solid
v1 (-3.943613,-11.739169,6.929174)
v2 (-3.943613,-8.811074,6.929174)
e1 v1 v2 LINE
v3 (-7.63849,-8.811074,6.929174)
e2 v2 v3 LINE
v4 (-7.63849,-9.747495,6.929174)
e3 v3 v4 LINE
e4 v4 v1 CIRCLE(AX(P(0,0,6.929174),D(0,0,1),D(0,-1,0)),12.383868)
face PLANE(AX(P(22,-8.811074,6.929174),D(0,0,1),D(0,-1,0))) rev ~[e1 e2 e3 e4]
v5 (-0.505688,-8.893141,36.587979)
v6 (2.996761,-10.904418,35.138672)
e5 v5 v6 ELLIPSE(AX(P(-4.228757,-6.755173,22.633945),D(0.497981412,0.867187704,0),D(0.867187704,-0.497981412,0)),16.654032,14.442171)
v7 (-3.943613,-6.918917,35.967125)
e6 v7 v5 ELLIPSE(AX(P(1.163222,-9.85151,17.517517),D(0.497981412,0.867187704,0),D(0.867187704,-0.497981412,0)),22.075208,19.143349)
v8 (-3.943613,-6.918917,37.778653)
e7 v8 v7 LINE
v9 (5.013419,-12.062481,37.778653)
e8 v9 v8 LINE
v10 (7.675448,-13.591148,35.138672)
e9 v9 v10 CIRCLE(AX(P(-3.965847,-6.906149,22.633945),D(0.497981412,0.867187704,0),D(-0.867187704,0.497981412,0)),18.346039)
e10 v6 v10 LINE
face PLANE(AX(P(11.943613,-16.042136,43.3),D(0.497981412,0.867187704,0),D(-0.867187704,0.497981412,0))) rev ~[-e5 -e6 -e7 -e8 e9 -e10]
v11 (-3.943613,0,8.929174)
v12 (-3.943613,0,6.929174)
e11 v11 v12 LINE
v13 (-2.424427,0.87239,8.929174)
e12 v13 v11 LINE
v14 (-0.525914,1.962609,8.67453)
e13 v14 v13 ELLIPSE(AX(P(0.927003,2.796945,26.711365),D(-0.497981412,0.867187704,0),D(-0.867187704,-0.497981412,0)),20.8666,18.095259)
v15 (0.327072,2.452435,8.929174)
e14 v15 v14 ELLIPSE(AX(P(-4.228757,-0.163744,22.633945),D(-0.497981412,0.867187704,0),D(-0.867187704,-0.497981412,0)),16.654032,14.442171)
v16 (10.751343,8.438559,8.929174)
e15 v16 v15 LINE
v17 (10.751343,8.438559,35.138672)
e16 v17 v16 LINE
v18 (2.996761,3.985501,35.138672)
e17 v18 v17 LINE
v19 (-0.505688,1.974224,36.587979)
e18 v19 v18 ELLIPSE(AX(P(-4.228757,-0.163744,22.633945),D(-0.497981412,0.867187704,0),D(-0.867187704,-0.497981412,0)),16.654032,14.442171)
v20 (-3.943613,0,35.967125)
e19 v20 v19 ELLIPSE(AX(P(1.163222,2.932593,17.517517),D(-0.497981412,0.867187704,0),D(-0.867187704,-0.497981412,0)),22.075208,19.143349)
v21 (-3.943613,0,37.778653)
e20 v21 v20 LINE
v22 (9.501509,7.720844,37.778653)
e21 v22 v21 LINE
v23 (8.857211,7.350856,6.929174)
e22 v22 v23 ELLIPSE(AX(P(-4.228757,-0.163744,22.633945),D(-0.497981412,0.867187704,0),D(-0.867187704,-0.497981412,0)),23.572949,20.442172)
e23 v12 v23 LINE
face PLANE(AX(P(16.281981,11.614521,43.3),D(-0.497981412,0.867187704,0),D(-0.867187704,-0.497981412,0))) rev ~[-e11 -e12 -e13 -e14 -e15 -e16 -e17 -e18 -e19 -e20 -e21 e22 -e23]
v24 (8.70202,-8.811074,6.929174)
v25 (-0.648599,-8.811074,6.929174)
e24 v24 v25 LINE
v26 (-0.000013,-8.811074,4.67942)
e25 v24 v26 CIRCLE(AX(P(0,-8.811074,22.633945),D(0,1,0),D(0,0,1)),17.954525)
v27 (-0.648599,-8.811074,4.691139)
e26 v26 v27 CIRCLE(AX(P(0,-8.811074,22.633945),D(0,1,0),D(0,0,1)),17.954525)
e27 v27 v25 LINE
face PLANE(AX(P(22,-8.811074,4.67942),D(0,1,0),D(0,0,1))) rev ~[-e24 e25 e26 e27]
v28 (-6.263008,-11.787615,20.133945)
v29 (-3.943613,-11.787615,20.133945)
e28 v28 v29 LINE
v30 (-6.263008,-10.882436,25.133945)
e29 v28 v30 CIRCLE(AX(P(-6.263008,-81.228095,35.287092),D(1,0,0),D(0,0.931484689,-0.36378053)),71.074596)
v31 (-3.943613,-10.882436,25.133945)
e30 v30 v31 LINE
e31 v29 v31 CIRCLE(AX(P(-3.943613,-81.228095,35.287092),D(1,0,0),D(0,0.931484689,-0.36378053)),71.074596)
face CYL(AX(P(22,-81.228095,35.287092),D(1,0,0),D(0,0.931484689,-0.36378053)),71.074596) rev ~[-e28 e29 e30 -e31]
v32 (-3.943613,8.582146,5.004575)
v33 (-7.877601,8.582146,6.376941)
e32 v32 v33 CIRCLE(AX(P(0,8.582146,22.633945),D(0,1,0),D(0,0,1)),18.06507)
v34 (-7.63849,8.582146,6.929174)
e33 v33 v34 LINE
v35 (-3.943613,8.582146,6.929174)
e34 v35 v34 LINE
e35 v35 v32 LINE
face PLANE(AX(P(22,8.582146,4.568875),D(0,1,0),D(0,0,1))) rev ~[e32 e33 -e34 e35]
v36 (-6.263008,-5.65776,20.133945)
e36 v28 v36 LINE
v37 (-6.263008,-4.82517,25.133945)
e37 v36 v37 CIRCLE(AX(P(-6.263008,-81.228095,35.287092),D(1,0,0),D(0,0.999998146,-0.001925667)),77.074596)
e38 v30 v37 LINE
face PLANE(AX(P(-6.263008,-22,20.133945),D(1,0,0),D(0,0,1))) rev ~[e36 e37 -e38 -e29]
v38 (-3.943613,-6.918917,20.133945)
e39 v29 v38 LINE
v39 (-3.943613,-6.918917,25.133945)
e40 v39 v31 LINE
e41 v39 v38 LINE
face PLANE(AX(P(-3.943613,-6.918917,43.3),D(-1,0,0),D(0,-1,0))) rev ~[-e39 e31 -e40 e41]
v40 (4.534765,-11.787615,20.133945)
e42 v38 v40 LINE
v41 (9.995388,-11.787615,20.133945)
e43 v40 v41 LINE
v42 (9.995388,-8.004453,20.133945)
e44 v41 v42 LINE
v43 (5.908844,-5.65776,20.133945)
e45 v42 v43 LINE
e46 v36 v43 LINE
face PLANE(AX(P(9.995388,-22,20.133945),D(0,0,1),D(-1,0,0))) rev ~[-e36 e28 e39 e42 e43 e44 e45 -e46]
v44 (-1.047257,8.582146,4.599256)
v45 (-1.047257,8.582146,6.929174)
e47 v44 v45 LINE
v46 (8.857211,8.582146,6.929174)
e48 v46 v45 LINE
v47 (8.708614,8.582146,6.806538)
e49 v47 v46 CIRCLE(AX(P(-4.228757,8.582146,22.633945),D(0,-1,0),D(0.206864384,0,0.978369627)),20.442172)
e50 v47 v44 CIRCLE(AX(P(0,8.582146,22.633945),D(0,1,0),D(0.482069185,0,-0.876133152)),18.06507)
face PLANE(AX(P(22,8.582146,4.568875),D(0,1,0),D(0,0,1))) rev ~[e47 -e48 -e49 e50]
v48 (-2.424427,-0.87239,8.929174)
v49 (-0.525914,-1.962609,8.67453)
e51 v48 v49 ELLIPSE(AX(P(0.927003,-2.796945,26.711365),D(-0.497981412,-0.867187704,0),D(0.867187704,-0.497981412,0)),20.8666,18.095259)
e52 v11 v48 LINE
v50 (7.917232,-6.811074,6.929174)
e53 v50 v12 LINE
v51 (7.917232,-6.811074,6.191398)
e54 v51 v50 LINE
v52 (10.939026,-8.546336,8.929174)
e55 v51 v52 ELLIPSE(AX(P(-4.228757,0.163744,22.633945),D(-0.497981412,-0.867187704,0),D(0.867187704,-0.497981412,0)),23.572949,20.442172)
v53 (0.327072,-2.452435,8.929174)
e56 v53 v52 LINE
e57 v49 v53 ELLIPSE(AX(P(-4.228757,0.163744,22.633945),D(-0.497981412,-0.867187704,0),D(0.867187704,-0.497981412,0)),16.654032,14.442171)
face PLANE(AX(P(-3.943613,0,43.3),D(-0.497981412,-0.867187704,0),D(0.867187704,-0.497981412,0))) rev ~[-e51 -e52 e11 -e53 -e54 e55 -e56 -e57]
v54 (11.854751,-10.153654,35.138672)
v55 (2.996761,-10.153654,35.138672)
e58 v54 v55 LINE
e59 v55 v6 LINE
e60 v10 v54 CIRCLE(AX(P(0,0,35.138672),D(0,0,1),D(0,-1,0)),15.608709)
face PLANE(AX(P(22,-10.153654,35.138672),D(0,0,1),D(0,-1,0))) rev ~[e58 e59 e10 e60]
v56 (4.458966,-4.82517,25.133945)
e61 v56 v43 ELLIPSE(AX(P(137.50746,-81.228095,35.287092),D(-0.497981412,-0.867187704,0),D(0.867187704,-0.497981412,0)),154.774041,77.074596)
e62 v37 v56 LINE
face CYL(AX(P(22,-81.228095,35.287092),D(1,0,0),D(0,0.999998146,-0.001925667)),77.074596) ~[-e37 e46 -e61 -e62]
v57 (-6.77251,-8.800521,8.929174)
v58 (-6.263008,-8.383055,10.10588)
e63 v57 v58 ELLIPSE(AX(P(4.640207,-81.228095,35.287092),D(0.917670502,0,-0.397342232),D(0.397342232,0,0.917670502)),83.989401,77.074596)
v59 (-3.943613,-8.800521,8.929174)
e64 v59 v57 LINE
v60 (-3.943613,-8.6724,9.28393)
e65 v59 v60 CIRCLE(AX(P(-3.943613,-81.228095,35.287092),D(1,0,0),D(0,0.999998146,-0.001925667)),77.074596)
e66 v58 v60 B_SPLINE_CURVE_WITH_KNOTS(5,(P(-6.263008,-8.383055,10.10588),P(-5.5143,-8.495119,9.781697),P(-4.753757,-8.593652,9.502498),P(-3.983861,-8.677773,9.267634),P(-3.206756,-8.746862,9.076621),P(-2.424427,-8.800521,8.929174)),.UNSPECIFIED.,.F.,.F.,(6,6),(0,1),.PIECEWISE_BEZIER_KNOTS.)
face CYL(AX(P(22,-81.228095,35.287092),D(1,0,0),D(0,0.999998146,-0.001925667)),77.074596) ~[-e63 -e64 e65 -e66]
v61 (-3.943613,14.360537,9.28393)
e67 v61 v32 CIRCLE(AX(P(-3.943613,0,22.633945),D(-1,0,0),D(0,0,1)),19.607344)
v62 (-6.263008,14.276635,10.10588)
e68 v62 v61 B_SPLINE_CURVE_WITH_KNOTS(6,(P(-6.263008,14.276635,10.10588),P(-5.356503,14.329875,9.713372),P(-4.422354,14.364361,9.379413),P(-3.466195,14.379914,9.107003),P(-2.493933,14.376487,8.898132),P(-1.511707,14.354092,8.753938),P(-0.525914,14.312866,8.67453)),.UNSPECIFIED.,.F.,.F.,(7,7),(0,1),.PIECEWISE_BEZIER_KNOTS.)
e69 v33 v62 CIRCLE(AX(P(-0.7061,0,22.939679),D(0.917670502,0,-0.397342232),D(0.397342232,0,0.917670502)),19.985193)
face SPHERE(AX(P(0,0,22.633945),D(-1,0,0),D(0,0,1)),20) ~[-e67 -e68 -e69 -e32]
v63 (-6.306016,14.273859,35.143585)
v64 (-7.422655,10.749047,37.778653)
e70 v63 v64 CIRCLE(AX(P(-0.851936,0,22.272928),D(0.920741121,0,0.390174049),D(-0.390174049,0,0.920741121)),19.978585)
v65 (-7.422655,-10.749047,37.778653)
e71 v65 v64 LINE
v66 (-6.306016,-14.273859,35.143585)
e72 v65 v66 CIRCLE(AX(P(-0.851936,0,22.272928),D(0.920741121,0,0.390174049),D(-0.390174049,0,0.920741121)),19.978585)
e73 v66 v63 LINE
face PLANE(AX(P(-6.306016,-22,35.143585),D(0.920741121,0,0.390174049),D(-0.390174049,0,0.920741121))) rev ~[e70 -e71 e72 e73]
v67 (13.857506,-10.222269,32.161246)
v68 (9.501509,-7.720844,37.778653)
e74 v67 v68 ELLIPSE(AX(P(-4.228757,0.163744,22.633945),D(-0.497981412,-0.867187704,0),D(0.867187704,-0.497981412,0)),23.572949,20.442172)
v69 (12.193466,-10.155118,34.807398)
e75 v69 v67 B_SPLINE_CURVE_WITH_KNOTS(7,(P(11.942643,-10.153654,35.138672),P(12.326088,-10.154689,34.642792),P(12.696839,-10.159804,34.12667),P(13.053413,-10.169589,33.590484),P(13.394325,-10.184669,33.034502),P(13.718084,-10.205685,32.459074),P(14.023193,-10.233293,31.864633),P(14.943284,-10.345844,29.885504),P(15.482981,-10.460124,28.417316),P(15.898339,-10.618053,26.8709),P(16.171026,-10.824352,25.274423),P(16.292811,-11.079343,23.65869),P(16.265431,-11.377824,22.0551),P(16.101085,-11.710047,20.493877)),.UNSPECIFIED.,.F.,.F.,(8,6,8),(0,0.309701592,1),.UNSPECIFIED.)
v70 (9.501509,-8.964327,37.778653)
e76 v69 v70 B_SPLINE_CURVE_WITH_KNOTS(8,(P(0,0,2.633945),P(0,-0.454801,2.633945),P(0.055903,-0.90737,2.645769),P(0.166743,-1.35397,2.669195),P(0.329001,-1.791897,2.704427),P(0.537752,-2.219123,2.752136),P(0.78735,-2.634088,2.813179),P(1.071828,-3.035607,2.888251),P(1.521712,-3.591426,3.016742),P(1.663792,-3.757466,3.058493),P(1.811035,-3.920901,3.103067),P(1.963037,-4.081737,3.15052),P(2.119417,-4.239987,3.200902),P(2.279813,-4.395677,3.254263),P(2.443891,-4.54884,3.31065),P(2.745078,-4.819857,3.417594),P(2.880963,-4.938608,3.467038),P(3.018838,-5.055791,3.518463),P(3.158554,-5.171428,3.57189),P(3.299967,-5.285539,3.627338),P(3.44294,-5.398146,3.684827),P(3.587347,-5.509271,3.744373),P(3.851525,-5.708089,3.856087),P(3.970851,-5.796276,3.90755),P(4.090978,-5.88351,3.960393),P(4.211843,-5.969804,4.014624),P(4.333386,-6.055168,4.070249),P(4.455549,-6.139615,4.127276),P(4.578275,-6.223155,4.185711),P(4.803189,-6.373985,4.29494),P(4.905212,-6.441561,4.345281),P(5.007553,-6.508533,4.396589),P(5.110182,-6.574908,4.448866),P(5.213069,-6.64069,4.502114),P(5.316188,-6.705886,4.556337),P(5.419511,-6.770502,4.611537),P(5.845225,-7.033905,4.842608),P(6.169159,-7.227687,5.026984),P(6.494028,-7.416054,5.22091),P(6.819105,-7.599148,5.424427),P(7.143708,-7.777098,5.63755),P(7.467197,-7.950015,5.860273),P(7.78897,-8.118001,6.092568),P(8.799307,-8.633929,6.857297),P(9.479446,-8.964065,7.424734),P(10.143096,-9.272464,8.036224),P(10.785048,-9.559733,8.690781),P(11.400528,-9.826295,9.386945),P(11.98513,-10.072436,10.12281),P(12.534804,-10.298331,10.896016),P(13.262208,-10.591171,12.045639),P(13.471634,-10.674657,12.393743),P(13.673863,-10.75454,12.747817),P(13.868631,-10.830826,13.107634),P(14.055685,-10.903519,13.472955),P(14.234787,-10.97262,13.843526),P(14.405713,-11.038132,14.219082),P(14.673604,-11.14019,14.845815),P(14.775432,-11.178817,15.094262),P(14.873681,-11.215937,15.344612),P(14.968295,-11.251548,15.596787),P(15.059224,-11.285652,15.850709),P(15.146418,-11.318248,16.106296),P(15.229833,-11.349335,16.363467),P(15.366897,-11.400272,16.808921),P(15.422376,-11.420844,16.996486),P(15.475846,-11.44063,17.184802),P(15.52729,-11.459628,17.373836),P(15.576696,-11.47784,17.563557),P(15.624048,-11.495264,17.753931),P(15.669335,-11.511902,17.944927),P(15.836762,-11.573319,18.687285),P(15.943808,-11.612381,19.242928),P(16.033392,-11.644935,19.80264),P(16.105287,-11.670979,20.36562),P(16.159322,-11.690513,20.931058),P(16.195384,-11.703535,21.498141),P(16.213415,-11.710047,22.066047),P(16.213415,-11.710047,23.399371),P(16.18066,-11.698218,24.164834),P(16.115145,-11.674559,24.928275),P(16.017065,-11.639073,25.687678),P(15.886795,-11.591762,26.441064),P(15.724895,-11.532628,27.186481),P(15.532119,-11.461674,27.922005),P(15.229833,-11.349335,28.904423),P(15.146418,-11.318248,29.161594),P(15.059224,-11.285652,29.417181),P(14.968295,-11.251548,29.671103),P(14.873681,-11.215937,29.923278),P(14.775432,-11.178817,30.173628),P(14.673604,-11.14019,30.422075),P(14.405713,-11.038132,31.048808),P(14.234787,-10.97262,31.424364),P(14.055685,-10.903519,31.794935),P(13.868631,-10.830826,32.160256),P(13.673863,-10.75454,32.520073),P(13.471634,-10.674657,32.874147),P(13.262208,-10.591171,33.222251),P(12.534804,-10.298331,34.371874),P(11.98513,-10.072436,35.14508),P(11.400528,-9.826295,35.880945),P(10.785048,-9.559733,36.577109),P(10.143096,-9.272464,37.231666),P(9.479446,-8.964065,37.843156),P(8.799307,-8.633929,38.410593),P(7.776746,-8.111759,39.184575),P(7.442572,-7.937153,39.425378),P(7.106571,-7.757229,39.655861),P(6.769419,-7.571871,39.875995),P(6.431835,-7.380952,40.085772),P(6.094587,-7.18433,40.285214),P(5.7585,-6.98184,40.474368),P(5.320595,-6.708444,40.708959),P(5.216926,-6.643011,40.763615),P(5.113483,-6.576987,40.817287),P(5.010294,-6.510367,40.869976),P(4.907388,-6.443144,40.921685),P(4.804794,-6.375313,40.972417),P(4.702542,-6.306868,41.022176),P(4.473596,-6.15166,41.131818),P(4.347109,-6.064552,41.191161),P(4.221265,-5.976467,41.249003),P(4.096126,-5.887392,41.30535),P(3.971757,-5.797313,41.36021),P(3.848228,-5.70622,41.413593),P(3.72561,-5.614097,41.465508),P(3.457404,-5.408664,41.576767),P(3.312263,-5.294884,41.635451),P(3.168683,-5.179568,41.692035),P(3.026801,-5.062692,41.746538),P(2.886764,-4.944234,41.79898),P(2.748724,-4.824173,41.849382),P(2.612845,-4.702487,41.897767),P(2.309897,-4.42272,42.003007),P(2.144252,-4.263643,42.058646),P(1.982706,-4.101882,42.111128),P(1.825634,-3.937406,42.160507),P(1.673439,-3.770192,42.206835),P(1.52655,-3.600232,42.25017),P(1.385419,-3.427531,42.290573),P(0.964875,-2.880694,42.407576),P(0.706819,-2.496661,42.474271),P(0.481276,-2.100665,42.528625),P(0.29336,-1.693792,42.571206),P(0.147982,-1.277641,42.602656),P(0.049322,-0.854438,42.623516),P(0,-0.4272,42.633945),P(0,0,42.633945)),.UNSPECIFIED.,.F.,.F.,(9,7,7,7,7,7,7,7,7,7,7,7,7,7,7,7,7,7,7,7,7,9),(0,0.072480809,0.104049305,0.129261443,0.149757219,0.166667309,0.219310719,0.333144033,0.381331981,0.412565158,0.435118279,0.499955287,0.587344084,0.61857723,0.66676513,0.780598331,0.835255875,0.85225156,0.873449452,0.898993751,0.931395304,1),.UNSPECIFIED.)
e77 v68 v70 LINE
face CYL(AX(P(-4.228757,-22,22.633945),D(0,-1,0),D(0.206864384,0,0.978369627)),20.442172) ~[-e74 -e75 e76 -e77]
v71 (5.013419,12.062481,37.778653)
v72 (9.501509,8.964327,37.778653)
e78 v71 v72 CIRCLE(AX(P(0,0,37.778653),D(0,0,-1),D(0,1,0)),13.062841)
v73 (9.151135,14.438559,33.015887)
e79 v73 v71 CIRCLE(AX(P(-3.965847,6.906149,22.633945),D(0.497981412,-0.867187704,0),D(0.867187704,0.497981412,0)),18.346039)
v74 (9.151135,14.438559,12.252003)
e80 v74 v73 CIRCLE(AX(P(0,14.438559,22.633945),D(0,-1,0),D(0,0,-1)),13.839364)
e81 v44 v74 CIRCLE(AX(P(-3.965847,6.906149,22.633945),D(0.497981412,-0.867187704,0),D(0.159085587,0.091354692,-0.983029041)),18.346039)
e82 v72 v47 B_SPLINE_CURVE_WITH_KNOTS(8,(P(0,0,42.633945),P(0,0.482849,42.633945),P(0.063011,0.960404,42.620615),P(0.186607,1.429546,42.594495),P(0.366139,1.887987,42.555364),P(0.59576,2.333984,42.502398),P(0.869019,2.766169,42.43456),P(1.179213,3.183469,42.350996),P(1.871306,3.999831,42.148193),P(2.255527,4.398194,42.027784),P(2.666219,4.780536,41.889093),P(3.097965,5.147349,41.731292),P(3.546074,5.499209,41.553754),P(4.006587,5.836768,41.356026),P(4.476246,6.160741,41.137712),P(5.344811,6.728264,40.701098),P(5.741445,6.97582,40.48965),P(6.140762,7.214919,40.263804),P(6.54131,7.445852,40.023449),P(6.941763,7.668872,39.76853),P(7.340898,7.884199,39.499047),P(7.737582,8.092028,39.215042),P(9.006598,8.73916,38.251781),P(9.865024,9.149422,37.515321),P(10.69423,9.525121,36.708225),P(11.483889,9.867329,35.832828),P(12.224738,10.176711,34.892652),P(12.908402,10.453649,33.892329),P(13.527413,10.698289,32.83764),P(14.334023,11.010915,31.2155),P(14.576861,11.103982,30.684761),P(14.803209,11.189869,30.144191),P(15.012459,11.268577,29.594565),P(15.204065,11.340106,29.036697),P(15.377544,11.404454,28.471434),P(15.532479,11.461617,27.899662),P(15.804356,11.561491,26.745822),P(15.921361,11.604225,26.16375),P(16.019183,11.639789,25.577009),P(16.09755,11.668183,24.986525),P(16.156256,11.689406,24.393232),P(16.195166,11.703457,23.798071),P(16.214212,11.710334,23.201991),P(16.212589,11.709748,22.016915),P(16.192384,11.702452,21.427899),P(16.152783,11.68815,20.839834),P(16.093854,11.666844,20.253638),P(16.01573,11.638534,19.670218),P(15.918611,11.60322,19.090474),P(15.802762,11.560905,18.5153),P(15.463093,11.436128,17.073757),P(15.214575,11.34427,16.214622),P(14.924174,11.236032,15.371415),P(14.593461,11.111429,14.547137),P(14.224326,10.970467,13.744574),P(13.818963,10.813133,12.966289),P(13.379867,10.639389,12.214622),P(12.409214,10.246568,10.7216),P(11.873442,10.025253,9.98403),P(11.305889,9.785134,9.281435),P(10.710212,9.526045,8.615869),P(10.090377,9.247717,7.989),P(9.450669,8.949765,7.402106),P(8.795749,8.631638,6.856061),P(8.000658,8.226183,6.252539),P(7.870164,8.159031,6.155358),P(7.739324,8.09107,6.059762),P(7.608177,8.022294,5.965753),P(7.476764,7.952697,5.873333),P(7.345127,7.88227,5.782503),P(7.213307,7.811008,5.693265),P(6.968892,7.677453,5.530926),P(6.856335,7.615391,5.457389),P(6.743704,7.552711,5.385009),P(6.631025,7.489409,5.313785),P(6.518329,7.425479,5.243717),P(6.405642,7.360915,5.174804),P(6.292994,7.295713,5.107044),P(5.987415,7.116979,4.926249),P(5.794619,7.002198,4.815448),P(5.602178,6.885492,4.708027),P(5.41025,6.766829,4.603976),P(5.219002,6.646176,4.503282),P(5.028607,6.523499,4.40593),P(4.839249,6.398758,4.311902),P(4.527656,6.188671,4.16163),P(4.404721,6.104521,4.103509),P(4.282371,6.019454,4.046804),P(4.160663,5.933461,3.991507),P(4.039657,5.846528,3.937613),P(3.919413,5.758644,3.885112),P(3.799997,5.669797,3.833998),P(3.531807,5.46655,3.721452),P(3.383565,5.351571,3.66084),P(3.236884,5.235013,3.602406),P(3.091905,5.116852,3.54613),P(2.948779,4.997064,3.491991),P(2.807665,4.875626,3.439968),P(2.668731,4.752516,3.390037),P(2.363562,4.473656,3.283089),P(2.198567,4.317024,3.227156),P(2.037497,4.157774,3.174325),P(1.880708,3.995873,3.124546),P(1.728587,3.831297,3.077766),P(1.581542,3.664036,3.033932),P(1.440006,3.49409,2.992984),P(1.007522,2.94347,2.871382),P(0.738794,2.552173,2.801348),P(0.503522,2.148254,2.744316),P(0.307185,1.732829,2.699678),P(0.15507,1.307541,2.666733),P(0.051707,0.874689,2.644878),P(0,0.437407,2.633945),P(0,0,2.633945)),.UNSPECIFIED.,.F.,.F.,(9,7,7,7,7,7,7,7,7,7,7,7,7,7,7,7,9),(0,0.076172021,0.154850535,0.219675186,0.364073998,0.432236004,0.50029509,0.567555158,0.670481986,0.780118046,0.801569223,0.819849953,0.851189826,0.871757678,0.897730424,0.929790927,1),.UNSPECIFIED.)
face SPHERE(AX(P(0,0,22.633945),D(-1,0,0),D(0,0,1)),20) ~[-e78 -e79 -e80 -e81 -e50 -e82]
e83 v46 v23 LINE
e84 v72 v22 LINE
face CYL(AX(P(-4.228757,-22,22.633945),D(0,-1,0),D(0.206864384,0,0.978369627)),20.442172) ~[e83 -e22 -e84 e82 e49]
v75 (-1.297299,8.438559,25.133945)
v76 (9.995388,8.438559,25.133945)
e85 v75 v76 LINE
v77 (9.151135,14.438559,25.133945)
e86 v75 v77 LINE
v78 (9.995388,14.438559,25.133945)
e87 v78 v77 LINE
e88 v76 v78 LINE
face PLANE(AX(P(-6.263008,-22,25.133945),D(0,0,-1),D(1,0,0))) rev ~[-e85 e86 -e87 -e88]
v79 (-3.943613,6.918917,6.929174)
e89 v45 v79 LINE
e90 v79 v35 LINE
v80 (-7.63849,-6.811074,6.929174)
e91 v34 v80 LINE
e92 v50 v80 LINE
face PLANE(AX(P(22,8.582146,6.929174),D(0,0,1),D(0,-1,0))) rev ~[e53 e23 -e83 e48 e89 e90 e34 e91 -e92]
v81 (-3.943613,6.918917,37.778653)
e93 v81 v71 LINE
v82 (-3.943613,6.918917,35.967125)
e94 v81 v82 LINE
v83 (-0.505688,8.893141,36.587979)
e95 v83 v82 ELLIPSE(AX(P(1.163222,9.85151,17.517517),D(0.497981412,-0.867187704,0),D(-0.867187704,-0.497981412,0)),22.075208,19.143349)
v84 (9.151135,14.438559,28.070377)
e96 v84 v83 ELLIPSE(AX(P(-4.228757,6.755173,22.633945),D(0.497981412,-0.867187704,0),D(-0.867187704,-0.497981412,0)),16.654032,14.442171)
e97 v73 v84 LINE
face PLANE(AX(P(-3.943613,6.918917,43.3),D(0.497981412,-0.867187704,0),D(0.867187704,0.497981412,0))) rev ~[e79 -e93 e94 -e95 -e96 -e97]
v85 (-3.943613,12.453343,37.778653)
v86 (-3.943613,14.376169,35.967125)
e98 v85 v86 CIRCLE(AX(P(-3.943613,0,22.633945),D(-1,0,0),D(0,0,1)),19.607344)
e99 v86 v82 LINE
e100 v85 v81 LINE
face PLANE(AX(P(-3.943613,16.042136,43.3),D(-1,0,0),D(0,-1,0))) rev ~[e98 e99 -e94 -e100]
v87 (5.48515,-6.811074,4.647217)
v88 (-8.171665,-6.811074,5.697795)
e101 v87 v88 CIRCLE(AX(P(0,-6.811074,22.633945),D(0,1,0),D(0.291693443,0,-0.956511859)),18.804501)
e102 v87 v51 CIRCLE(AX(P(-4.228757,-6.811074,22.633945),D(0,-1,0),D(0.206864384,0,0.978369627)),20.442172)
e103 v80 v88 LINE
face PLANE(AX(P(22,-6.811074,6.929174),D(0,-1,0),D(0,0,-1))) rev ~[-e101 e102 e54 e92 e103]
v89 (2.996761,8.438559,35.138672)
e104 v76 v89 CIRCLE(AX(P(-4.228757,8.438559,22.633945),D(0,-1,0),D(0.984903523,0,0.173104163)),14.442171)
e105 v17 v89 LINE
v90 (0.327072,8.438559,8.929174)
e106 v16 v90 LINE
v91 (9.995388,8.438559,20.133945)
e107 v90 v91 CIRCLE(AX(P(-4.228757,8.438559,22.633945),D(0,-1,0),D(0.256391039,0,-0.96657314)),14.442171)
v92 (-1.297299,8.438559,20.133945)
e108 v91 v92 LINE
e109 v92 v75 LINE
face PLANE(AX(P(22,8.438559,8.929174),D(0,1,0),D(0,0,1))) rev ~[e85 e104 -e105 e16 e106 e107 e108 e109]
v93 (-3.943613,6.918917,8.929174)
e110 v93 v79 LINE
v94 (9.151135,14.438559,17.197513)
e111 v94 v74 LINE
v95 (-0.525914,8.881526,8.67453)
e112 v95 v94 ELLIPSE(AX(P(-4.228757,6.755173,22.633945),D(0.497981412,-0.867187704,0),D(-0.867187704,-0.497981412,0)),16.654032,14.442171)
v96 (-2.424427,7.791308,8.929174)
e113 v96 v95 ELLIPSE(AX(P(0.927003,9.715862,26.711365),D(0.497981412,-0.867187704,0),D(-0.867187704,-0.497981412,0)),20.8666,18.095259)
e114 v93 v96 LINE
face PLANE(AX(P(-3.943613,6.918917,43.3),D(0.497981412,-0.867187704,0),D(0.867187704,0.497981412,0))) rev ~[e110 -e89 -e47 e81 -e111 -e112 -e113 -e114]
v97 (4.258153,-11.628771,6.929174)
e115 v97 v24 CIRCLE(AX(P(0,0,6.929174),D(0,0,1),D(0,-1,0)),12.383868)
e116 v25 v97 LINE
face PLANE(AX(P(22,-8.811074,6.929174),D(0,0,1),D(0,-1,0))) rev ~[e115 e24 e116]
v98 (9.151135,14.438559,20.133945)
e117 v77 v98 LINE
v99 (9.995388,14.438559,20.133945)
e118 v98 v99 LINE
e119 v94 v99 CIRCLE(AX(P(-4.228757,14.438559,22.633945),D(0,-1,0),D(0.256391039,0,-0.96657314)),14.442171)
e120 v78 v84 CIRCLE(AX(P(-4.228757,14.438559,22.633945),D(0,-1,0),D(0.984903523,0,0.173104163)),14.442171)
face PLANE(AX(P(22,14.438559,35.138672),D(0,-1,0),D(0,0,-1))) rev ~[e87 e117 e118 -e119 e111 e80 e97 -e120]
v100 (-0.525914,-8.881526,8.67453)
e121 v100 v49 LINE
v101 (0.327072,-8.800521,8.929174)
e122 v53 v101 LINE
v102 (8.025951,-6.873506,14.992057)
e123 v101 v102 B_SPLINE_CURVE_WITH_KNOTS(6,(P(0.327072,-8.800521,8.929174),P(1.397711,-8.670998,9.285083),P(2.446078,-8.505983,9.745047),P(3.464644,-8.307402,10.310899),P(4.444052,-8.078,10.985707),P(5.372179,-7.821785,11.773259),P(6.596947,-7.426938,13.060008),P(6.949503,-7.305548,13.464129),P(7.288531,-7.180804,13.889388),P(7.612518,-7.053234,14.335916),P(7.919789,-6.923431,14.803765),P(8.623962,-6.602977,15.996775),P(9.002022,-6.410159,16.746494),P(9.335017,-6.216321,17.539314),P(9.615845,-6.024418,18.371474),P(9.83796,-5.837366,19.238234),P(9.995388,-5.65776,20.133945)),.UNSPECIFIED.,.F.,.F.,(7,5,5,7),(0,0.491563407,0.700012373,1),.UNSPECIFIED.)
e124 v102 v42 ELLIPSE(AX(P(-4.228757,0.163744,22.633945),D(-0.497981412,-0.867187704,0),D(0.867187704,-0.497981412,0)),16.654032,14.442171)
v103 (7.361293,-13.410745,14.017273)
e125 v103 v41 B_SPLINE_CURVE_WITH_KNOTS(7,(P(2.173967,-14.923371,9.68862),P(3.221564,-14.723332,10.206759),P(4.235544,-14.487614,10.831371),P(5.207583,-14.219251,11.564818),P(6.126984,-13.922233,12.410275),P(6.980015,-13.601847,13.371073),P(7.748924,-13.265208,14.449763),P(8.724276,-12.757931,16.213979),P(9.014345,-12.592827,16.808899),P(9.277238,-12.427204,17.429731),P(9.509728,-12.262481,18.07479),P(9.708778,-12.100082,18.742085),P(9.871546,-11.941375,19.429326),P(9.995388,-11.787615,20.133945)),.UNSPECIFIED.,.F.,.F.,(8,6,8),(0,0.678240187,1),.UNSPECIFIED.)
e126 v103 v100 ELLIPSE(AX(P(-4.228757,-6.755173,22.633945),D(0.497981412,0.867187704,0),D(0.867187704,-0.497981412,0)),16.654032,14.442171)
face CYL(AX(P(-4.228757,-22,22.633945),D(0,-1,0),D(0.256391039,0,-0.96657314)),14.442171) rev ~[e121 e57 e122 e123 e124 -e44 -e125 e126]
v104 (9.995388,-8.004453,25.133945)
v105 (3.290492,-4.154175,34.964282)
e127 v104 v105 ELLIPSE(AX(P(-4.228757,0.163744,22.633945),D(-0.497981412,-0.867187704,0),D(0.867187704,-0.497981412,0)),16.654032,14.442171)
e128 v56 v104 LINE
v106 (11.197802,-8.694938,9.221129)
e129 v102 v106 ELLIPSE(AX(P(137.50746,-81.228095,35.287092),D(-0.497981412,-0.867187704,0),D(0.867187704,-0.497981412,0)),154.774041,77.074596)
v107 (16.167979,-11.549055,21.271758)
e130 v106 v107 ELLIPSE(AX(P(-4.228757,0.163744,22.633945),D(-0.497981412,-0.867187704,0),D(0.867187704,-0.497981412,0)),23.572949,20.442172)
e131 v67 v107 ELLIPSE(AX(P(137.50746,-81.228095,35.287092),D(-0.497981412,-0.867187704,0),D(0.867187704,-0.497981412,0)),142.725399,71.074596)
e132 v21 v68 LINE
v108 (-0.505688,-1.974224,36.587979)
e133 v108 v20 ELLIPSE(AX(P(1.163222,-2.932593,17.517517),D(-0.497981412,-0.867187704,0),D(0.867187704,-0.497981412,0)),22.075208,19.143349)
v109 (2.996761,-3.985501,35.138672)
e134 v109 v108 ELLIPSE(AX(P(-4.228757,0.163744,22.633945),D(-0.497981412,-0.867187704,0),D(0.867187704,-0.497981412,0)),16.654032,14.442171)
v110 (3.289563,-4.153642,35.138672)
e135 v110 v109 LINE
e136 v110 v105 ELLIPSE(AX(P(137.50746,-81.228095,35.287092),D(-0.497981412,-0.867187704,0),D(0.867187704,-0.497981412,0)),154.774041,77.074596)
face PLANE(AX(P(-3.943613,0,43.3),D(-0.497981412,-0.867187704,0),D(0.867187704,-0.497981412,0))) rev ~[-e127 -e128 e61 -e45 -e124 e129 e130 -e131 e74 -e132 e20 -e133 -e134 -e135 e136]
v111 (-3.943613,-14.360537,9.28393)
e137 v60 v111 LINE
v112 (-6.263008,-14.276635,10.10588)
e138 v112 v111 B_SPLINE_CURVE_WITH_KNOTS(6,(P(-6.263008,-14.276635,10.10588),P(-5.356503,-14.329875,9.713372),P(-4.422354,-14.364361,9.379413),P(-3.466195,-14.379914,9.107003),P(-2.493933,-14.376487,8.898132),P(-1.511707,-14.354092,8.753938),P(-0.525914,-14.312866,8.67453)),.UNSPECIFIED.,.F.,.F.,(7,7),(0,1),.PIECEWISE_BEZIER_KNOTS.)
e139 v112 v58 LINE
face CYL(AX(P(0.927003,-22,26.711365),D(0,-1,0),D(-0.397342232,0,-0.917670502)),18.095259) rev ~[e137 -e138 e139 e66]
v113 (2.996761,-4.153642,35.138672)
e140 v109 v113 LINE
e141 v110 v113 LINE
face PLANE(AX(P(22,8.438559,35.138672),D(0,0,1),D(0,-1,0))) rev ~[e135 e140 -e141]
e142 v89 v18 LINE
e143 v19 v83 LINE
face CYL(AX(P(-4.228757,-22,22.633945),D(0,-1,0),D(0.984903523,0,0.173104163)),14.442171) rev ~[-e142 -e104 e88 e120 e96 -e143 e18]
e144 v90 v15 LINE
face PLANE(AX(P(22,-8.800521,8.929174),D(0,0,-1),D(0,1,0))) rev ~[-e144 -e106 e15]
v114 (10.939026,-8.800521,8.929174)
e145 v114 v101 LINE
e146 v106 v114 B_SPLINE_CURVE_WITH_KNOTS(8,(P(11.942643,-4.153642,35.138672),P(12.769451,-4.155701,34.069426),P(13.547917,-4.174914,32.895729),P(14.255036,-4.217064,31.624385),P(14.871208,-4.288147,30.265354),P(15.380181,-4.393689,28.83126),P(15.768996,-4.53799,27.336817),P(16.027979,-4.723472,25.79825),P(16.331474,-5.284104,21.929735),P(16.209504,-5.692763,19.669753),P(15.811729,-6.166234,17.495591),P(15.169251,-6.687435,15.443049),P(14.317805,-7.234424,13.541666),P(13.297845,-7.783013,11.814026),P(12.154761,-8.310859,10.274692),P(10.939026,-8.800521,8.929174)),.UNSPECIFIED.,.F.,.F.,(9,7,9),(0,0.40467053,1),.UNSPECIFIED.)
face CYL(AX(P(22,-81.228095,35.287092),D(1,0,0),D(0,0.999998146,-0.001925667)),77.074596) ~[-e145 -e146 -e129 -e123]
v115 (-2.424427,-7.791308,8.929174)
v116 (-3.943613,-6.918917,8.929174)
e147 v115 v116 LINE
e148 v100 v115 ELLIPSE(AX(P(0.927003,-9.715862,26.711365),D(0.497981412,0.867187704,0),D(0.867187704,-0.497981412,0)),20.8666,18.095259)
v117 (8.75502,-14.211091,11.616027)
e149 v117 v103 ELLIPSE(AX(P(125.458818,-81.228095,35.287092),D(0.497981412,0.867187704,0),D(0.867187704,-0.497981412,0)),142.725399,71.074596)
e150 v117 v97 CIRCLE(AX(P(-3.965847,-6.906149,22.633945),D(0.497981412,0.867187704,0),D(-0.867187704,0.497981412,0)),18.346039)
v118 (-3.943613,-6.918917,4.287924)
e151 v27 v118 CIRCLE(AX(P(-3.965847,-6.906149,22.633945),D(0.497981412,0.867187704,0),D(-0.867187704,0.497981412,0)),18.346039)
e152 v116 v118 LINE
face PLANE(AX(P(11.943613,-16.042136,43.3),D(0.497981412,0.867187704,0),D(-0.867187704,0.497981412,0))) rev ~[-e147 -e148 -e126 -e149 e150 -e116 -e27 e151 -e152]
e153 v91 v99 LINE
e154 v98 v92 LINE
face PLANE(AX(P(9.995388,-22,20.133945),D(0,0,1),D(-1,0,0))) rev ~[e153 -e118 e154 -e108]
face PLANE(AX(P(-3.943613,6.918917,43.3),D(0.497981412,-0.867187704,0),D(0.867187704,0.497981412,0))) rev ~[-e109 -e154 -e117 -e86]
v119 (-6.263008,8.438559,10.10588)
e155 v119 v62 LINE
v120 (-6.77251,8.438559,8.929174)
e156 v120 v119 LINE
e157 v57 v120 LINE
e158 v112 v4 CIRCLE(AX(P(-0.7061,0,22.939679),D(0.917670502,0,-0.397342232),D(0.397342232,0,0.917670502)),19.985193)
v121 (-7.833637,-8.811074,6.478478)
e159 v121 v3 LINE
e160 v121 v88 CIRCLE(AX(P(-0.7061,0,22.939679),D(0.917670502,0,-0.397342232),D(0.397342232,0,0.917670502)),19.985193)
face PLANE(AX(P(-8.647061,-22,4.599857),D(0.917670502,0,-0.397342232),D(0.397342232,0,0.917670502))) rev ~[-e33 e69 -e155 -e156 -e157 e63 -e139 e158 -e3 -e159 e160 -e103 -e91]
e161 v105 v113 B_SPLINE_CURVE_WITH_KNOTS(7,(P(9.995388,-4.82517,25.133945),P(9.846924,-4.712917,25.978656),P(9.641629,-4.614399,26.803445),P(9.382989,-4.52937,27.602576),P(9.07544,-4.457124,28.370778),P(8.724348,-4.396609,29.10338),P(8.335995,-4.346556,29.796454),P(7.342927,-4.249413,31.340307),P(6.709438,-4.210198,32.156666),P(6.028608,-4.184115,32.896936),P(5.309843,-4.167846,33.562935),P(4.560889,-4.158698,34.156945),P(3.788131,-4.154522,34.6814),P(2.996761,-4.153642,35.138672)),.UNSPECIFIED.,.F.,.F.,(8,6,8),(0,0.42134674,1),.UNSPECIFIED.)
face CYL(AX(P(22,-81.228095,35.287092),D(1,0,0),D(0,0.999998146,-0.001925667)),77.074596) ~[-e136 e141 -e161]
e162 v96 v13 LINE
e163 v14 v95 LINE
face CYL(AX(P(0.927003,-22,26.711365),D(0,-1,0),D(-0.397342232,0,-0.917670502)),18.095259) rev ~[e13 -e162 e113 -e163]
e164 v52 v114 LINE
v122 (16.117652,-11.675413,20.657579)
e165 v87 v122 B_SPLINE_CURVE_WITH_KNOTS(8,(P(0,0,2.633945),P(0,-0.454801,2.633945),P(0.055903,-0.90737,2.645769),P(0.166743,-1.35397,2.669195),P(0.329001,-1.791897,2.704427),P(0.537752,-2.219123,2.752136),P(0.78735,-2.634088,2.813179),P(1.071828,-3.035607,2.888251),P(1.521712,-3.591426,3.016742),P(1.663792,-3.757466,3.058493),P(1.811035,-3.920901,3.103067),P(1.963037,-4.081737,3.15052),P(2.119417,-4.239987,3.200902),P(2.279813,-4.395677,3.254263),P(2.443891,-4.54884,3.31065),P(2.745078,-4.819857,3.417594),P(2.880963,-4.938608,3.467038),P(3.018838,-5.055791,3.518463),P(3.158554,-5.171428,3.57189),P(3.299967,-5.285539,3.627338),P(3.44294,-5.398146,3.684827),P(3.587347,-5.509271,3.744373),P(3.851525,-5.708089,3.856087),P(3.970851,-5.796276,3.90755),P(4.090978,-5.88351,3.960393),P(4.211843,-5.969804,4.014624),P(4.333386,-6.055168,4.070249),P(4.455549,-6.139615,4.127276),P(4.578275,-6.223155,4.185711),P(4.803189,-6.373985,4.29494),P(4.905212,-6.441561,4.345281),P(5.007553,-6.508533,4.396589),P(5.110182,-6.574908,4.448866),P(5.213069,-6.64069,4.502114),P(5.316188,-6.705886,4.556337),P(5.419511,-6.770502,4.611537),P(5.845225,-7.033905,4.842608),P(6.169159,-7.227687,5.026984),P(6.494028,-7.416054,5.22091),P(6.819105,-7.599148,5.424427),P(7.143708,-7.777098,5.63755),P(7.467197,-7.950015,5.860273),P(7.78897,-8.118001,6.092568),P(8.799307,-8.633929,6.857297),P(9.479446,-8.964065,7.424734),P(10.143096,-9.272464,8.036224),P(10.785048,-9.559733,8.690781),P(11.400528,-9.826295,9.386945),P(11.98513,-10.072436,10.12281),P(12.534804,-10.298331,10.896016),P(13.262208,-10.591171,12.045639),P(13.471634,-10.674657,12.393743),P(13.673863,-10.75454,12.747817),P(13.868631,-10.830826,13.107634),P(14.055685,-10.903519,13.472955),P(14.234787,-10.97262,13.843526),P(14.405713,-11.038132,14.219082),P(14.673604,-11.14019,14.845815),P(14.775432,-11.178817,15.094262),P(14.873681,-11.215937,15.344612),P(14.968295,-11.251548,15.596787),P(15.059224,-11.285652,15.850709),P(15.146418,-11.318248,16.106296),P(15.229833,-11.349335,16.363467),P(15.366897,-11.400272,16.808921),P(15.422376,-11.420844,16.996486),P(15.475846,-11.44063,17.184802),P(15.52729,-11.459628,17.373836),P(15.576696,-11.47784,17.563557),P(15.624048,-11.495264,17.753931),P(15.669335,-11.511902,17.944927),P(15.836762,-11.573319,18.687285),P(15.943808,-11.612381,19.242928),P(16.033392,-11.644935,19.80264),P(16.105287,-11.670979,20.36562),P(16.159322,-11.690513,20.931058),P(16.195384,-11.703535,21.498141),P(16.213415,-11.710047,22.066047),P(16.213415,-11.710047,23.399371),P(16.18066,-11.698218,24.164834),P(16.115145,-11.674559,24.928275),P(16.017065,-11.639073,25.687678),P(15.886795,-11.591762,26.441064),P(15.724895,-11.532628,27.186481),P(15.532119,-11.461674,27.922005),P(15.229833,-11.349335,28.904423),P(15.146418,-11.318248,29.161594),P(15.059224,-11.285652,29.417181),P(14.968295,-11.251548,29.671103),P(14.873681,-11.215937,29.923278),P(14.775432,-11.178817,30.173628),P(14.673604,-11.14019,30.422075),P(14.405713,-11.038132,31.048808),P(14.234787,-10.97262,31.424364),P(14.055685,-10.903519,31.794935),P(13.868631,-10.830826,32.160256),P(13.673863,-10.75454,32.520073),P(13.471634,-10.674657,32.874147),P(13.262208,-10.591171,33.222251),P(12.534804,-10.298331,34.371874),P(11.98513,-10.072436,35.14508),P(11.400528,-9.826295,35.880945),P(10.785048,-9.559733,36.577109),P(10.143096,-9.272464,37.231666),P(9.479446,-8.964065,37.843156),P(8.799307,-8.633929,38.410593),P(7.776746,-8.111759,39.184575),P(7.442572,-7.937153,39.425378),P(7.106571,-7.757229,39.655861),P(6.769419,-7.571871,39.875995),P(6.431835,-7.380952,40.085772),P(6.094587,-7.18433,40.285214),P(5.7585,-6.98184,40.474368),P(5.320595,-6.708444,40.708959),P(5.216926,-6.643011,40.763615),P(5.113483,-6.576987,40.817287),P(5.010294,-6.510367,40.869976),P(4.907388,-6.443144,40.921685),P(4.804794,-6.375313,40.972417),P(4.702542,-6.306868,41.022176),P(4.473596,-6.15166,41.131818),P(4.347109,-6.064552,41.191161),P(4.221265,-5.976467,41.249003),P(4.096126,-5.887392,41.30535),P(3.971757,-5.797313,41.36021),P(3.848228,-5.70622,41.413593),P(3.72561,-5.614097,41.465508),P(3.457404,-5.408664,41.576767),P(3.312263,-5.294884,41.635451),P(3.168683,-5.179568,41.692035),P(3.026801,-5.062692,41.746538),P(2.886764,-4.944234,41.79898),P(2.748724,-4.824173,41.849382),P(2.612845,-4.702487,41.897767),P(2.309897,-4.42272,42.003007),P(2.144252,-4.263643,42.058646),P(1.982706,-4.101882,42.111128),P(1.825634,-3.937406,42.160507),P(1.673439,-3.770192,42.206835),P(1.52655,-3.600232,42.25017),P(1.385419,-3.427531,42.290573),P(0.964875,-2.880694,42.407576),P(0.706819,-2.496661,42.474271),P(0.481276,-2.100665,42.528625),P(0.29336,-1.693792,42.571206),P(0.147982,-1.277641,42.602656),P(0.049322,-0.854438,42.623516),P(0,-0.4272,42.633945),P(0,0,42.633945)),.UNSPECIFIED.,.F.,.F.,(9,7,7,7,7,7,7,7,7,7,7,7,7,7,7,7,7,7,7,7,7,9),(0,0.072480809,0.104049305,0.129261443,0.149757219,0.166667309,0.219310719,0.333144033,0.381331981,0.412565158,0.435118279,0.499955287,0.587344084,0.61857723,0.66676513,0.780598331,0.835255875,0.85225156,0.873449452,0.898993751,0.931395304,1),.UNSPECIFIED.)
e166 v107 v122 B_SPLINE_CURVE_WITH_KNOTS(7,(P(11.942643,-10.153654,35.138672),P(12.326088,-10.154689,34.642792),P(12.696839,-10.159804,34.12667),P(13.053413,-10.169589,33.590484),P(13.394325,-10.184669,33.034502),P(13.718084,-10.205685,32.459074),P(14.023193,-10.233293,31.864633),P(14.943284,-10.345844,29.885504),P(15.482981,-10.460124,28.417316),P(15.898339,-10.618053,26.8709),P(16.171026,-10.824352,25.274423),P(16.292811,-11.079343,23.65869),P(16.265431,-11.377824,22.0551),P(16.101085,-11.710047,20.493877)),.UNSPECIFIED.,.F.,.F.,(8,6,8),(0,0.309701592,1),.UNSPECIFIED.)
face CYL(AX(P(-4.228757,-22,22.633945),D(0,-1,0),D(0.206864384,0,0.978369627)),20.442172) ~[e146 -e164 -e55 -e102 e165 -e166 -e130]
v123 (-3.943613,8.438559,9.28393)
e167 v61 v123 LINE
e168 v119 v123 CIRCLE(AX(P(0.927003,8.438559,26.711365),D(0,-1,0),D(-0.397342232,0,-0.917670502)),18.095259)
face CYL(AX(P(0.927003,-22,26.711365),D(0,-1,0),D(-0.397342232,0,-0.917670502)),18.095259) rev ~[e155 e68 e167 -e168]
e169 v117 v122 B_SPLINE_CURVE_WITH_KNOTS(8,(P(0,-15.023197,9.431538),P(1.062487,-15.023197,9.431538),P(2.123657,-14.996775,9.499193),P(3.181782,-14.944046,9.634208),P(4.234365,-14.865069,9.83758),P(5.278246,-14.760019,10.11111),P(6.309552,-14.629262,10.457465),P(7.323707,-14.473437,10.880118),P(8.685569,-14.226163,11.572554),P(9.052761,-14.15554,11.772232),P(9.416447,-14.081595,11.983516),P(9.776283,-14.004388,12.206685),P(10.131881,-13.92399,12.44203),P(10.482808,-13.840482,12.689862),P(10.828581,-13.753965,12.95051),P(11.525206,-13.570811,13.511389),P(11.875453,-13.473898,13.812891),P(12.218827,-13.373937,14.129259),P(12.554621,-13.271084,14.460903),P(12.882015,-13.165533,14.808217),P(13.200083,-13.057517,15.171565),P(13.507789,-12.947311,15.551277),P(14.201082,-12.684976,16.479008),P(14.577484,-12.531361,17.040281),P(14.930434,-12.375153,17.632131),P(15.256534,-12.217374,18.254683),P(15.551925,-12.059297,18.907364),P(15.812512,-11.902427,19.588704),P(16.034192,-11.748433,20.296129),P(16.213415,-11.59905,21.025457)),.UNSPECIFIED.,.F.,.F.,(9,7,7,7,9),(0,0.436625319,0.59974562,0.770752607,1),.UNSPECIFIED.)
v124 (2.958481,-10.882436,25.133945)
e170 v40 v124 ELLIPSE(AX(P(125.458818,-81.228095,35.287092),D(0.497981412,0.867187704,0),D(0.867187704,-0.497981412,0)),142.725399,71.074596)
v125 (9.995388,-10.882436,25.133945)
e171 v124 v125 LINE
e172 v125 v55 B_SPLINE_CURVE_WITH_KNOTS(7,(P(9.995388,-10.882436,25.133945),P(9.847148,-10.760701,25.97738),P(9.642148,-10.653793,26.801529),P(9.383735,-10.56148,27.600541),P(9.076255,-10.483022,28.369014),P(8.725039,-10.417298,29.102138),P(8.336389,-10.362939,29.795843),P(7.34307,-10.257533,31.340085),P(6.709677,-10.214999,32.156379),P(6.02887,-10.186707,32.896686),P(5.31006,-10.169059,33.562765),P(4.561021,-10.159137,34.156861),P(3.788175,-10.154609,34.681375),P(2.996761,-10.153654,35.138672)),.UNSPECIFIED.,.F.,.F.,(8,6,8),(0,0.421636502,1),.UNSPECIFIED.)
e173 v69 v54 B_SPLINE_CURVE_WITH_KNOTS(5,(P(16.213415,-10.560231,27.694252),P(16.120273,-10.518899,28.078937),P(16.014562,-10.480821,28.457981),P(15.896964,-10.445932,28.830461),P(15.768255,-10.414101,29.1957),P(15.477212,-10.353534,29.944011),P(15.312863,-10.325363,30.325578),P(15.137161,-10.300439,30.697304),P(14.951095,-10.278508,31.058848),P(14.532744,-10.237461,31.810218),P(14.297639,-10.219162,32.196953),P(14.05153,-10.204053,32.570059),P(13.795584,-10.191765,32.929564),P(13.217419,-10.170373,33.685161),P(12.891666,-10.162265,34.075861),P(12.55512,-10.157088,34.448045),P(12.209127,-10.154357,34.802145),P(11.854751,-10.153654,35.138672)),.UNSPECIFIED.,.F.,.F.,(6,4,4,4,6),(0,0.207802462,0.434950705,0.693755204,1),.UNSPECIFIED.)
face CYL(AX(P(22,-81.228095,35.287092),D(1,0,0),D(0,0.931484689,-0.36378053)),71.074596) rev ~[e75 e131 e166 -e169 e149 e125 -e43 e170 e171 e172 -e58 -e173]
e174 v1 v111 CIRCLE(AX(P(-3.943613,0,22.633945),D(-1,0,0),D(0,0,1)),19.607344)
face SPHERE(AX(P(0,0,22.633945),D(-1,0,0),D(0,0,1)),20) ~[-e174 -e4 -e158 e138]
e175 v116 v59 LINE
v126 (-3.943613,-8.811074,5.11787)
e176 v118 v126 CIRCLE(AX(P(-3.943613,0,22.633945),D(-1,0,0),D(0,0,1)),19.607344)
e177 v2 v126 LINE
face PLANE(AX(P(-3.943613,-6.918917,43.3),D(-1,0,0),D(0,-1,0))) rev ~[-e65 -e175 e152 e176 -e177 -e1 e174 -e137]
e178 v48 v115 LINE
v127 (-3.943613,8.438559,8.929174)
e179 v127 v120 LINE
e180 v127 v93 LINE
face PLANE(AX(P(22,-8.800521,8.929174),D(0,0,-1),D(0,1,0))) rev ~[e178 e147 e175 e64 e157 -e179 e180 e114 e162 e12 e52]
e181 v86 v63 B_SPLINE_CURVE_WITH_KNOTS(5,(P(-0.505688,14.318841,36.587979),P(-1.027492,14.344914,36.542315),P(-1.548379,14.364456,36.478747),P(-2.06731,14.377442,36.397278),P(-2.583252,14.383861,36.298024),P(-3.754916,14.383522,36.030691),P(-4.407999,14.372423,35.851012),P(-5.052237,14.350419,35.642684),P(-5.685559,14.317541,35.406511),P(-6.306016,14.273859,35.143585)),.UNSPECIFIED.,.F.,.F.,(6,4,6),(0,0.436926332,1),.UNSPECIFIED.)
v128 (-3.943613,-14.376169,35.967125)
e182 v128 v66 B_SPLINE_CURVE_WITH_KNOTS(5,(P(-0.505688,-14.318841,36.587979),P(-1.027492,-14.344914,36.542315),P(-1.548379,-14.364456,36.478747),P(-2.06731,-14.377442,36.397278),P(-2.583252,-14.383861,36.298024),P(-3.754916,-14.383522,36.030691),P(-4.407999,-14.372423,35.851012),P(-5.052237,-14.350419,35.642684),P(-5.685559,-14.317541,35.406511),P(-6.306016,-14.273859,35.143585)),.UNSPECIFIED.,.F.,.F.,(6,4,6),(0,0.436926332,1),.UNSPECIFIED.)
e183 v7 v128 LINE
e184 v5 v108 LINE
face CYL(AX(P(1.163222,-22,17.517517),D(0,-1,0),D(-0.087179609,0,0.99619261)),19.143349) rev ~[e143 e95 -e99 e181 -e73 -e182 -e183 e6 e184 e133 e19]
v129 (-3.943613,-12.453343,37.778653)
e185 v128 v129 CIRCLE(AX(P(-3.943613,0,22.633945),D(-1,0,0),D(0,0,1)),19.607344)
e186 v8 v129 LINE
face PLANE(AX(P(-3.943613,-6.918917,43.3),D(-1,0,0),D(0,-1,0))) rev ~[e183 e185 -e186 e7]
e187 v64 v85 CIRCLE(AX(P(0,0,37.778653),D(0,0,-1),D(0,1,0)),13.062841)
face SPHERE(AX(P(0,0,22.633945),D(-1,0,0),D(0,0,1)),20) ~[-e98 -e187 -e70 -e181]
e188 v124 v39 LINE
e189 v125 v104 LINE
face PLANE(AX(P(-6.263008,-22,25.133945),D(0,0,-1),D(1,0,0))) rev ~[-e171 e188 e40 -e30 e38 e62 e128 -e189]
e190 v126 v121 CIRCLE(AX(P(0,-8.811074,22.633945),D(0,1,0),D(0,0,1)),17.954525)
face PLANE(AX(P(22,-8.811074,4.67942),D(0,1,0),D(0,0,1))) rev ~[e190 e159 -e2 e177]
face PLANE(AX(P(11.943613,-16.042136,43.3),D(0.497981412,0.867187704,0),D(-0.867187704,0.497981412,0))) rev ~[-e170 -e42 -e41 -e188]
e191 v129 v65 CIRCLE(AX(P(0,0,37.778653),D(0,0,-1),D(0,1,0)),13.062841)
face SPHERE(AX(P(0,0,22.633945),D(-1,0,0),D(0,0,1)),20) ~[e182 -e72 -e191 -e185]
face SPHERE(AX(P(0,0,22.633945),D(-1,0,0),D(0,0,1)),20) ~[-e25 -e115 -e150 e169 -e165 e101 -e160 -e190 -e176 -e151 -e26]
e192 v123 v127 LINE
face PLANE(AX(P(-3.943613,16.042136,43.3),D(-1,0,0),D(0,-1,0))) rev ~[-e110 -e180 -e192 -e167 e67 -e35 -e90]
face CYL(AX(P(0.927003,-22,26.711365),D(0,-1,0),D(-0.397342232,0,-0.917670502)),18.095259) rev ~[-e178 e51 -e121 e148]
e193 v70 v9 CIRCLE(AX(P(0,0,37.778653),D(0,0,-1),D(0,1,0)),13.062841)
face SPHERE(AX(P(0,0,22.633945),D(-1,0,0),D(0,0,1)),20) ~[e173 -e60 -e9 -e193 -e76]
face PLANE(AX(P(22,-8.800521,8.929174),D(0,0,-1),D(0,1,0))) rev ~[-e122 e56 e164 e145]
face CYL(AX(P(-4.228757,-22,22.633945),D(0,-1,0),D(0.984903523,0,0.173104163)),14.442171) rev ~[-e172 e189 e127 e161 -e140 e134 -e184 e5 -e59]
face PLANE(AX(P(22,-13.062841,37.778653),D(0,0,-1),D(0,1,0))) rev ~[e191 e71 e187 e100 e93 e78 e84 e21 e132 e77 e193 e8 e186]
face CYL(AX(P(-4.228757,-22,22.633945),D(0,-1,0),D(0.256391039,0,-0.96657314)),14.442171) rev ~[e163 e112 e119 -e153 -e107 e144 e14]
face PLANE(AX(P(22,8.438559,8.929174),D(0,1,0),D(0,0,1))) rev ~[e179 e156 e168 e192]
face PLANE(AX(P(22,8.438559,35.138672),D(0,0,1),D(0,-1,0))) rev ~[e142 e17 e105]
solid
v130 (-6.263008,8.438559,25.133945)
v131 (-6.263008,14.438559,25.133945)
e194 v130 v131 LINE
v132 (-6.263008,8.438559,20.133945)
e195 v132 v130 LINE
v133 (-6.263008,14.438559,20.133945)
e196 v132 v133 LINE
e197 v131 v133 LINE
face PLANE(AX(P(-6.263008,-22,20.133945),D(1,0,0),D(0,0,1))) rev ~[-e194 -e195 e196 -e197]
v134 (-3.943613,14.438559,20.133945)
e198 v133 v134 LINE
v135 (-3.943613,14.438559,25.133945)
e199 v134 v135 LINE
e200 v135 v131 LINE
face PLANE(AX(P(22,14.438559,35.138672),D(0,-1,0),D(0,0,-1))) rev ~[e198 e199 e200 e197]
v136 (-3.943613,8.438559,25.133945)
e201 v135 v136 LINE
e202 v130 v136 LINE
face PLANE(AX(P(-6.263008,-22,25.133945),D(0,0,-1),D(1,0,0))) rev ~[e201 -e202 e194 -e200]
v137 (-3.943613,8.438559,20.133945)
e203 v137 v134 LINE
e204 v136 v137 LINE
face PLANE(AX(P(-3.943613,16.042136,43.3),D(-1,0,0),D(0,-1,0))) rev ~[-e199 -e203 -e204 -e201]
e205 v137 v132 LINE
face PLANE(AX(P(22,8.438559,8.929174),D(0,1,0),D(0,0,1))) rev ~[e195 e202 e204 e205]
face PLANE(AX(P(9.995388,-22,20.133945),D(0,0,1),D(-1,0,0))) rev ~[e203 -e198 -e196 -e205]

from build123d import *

# Parameters (mm, degrees)
F6_DEPTH  = 48.9
F8_DEPTH  = 73.9
F10_DEPTH = 48.9


# Not quite as in the source:
# - a feature names something its author has since deleted; it is built from what else it names


with BuildPart() as f1:
    # F0 (on Front) → F1 (revolve)
    with BuildSketch(Plane.XZ):
        with BuildLine():
            Line((0, 22.6339450173), (20, 22.6339450173))
            ThreePointArc((20, 22.6339450173), (0, 42.6339450173), (-20, 22.6339450173))
            Line((-20, 22.6339450173), (0, 22.6339450173))
        make_face()
    revolve(axis=Axis((-10, 0, 22.6339450173), (1, 0, 0)))

    # F5 (on offset) → F6 (cut)
    with BuildSketch(Plane.XY.offset(43.3)):
        with BuildLine():
            Line((-11.943612595, -16.0421357113), (-11.943612595, 16.0421357113))
            ThreePointArc((-11.943612595, 16.0421357113), (-20, 0), (-11.943612595, -16.0421357113))
        make_face()
        with BuildLine():
            Line((-3.943612595, -16.0421357113), (-11.943612595, -16.0421357113))
            ThreePointArc((-11.943612595, -16.0421357113), (0, -20), (11.943612595, -16.0421357113))
            Line((11.943612595, -16.0421357113), (-3.943612595, -6.9189172936))
            Line((-3.943612595, -6.9189172936), (-3.943612595, -16.0421357113))
        make_face()
        with BuildLine():
            ThreePointArc((20, 0), (19.0478295378, 6.0975560595), (16.2819810101, 11.6145208418))
            Line((16.2819810101, 11.6145208418), (-3.943612595, 0))
            Line((-3.943612595, 0), (16.2819810101, -11.6145208418))
            ThreePointArc((16.2819810101, -11.6145208418), (19.0478295378, -6.0975560595), (20, 0))
        make_face()
        with BuildLine():
            ThreePointArc((11.943612595, 16.0421357113), (0, 20), (-11.943612595, 16.0421357113))
            Line((-11.943612595, 16.0421357113), (-3.943612595, 16.0421357113))
            Line((-3.943612595, 16.0421357113), (-3.943612595, 6.9189172936))
            Line((-3.943612595, 6.9189172936), (11.943612595, 16.0421357113))
        make_face()
    extrude(amount=-F6_DEPTH, mode=Mode.SUBTRACT)

    # F7 (on offset) → F8 (cut)
    with BuildSketch(Plane.XZ.offset(22)):
        with BuildLine():
            ThreePointArc((-8.6470612384, 40.6680330713), (-4.4108839223, 42.0352124388), (0, 42.6339450173))
            ThreePointArc((0, 42.6339450173), (-4.4338605594, 42.1362751484), (-8.6470612384, 40.6680330713))
        make_face()
        with BuildLine():
            ThreePointArc((-8.6470612384, 4.5998569633), (-4.4338605594, 3.1316148863), (0, 2.6339450173))
            ThreePointArc((0, 2.6339450173), (-4.4147481905, 3.2156806169), (-8.6470612384, 4.5998569633))
        make_face()
        with BuildLine():
            ThreePointArc((0, 2.6339450173), (14.1421356237, 8.4918093936), (20, 22.6339450173))
            ThreePointArc((20, 22.6339450173), (14.1421356237, 36.7760806411), (0, 42.6339450173))
            ThreePointArc((0, 42.6339450173), (16.2134145309, 22.6339450173), (0, 2.6339450173))
        make_face()
        with BuildLine():
            Line((-6.3060164348, 35.1435851435), (-8.6470612384, 40.6680330713))
            ThreePointArc((-8.6470612384, 40.6680330713), (-20, 22.6339450173), (-8.6470612384, 4.5998569633))
            Line((-8.6470612384, 4.5998569633), (-6.2630078533, 10.105879966))
            ThreePointArc((-6.2630078533, 10.105879966), (-3.4533212877, 9.1542824914), (-0.5259139232, 8.6745299795))
            ThreePointArc((-0.5259139232, 8.6745299795), (6.4095593768, 12.8665228434), (9.9953882922, 20.1339450173))
            Line((9.9953882922, 20.1339450173), (-6.2630078533, 20.1339450173))
            Line((-6.2630078533, 20.1339450173), (-6.2630078533, 25.1339450173))
            Line((-6.2630078533, 25.1339450173), (9.9953882922, 25.1339450173))
            ThreePointArc((9.9953882922, 25.1339450173), (6.4166339458, 32.3936562253), (-0.5056881537, 36.587979323))
            ThreePointArc((-0.5056881537, 36.587979323), (-3.4625761579, 36.093571181), (-6.3060164348, 35.1435851435))
        make_face()
    extrude(amount=-F8_DEPTH, mode=Mode.SUBTRACT)

    # F9 (on offset) → F10 (cut)
    with BuildSketch(Plane.YZ.offset(22)):
        with BuildLine():
            ThreePointArc((-14.5121786365, 36.3960913333), (-13.8048288932, 37.1055274888), (-13.0628413392, 37.7786528767))
            Line((-13.0628413392, 37.7786528767), (-14.5121786365, 37.7786528767))
            Line((-14.5121786365, 37.7786528767), (-14.5121786365, 36.3960913333))
        make_face()
        with BuildLine():
            Line((-6.8110743198, 3.0763908625), (-6.8110743198, 3.8294437846))
            ThreePointArc((-6.8110743198, 3.8294437846), (-7.8226272385, 4.2272477827), (-8.8110743198, 4.6794199796))
            Line((-8.8110743198, 4.6794199796), (-8.8110743198, 3.0763908625))
            Line((-8.8110743198, 3.0763908625), (-6.8110743198, 3.0763908625))
        make_face()
        with BuildLine():
            Line((10.5821458962, 1.4693343882), (10.5821458962, 5.6628464014))
            ThreePointArc((10.5821458962, 5.6628464014), (9.5977452348, 5.0873417447), (8.5821458962, 4.5688745271))
            Line((8.5821458962, 4.5688745271), (8.5821458962, 1.4693343882))
            Line((8.5821458962, 1.4693343882), (10.5821458962, 1.4693343882))
        make_face()
        with BuildLine():
            Line((-14.5121786365, 35.1386720749), (-14.5121786365, 36.3960913333))
            ThreePointArc((-14.5121786365, 36.3960913333), (-19.9964093785, 23.0129067158), (-15.0231970267, 9.4315379983))
            ThreePointArc((-15.0231970267, 9.4315379983), (-11.3953060336, 22.0590998115), (-10.1536539841, 35.1386720749))
            Line((-10.1536539841, 35.1386720749), (-14.5121786365, 35.1386720749))
        make_face()
        with BuildLine():
            Line((-4.193781408, 37.7786528767), (13.0628413392, 37.7786528767))
            ThreePointArc((13.0628413392, 37.7786528767), (0, 42.6339450173), (-13.0628413392, 37.7786528767))
            Line((-13.0628413392, 37.7786528767), (-4.193781408, 37.7786528767))
        make_face()
        with BuildLine():
            ThreePointArc((14.4385592904, 8.7945806672), (18.5576289677, 15.176438256), (20, 22.6339450173))
            ThreePointArc((20, 22.6339450173), (18.5774537105, 30.041928119), (14.5121786365, 36.3960913333))
            Line((14.5121786365, 36.3960913333), (14.5121786365, 35.1386720749))
            Line((14.5121786365, 35.1386720749), (14.4385592904, 35.1386720749))
            Line((14.4385592904, 35.1386720749), (14.4385592904, 8.9291743934))
            Line((14.4385592904, 8.9291743934), (14.4385592904, 8.7945806672))
        make_face()
        with BuildLine():
            Line((-8.8005206947, 8.9291743934), (8.4385592904, 8.9291743934))
            Line((8.4385592904, 8.9291743934), (8.4385592904, 35.1386720749))
            Line((8.4385592904, 35.1386720749), (-4.1536419204, 35.1386720749))
            ThreePointArc((-4.1536419204, 35.1386720749), (-5.337064627, 21.8318011111), (-8.8005206947, 8.9291743934))
        make_face()
        with BuildLine():
            ThreePointArc((-6.8110743198, 3.8294437846), (0.9596161149, 2.6569798596), (8.5821458962, 4.5688745271))
            Line((8.5821458962, 4.5688745271), (8.5821458962, 6.9291743934))
            Line((8.5821458962, 6.9291743934), (-6.8110743198, 6.9291743934))
            Line((-6.8110743198, 6.9291743934), (-6.8110743198, 3.8294437846))
        make_face()
        with BuildLine():
            Line((-8.8110743198, 6.9291743934), (-9.5599580869, 6.9291743934))
            Line((-9.5599580869, 6.9291743934), (-12.3838677177, 6.9291743934))
            ThreePointArc((-12.3838677177, 6.9291743934), (-10.6570043035, 5.7097534775), (-8.8110743198, 4.6794199796))
            Line((-8.8110743198, 4.6794199796), (-8.8110743198, 6.9291743934))
        make_face()
    extrude(amount=-F10_DEPTH, mode=Mode.SUBTRACT)


solid = f1.part
